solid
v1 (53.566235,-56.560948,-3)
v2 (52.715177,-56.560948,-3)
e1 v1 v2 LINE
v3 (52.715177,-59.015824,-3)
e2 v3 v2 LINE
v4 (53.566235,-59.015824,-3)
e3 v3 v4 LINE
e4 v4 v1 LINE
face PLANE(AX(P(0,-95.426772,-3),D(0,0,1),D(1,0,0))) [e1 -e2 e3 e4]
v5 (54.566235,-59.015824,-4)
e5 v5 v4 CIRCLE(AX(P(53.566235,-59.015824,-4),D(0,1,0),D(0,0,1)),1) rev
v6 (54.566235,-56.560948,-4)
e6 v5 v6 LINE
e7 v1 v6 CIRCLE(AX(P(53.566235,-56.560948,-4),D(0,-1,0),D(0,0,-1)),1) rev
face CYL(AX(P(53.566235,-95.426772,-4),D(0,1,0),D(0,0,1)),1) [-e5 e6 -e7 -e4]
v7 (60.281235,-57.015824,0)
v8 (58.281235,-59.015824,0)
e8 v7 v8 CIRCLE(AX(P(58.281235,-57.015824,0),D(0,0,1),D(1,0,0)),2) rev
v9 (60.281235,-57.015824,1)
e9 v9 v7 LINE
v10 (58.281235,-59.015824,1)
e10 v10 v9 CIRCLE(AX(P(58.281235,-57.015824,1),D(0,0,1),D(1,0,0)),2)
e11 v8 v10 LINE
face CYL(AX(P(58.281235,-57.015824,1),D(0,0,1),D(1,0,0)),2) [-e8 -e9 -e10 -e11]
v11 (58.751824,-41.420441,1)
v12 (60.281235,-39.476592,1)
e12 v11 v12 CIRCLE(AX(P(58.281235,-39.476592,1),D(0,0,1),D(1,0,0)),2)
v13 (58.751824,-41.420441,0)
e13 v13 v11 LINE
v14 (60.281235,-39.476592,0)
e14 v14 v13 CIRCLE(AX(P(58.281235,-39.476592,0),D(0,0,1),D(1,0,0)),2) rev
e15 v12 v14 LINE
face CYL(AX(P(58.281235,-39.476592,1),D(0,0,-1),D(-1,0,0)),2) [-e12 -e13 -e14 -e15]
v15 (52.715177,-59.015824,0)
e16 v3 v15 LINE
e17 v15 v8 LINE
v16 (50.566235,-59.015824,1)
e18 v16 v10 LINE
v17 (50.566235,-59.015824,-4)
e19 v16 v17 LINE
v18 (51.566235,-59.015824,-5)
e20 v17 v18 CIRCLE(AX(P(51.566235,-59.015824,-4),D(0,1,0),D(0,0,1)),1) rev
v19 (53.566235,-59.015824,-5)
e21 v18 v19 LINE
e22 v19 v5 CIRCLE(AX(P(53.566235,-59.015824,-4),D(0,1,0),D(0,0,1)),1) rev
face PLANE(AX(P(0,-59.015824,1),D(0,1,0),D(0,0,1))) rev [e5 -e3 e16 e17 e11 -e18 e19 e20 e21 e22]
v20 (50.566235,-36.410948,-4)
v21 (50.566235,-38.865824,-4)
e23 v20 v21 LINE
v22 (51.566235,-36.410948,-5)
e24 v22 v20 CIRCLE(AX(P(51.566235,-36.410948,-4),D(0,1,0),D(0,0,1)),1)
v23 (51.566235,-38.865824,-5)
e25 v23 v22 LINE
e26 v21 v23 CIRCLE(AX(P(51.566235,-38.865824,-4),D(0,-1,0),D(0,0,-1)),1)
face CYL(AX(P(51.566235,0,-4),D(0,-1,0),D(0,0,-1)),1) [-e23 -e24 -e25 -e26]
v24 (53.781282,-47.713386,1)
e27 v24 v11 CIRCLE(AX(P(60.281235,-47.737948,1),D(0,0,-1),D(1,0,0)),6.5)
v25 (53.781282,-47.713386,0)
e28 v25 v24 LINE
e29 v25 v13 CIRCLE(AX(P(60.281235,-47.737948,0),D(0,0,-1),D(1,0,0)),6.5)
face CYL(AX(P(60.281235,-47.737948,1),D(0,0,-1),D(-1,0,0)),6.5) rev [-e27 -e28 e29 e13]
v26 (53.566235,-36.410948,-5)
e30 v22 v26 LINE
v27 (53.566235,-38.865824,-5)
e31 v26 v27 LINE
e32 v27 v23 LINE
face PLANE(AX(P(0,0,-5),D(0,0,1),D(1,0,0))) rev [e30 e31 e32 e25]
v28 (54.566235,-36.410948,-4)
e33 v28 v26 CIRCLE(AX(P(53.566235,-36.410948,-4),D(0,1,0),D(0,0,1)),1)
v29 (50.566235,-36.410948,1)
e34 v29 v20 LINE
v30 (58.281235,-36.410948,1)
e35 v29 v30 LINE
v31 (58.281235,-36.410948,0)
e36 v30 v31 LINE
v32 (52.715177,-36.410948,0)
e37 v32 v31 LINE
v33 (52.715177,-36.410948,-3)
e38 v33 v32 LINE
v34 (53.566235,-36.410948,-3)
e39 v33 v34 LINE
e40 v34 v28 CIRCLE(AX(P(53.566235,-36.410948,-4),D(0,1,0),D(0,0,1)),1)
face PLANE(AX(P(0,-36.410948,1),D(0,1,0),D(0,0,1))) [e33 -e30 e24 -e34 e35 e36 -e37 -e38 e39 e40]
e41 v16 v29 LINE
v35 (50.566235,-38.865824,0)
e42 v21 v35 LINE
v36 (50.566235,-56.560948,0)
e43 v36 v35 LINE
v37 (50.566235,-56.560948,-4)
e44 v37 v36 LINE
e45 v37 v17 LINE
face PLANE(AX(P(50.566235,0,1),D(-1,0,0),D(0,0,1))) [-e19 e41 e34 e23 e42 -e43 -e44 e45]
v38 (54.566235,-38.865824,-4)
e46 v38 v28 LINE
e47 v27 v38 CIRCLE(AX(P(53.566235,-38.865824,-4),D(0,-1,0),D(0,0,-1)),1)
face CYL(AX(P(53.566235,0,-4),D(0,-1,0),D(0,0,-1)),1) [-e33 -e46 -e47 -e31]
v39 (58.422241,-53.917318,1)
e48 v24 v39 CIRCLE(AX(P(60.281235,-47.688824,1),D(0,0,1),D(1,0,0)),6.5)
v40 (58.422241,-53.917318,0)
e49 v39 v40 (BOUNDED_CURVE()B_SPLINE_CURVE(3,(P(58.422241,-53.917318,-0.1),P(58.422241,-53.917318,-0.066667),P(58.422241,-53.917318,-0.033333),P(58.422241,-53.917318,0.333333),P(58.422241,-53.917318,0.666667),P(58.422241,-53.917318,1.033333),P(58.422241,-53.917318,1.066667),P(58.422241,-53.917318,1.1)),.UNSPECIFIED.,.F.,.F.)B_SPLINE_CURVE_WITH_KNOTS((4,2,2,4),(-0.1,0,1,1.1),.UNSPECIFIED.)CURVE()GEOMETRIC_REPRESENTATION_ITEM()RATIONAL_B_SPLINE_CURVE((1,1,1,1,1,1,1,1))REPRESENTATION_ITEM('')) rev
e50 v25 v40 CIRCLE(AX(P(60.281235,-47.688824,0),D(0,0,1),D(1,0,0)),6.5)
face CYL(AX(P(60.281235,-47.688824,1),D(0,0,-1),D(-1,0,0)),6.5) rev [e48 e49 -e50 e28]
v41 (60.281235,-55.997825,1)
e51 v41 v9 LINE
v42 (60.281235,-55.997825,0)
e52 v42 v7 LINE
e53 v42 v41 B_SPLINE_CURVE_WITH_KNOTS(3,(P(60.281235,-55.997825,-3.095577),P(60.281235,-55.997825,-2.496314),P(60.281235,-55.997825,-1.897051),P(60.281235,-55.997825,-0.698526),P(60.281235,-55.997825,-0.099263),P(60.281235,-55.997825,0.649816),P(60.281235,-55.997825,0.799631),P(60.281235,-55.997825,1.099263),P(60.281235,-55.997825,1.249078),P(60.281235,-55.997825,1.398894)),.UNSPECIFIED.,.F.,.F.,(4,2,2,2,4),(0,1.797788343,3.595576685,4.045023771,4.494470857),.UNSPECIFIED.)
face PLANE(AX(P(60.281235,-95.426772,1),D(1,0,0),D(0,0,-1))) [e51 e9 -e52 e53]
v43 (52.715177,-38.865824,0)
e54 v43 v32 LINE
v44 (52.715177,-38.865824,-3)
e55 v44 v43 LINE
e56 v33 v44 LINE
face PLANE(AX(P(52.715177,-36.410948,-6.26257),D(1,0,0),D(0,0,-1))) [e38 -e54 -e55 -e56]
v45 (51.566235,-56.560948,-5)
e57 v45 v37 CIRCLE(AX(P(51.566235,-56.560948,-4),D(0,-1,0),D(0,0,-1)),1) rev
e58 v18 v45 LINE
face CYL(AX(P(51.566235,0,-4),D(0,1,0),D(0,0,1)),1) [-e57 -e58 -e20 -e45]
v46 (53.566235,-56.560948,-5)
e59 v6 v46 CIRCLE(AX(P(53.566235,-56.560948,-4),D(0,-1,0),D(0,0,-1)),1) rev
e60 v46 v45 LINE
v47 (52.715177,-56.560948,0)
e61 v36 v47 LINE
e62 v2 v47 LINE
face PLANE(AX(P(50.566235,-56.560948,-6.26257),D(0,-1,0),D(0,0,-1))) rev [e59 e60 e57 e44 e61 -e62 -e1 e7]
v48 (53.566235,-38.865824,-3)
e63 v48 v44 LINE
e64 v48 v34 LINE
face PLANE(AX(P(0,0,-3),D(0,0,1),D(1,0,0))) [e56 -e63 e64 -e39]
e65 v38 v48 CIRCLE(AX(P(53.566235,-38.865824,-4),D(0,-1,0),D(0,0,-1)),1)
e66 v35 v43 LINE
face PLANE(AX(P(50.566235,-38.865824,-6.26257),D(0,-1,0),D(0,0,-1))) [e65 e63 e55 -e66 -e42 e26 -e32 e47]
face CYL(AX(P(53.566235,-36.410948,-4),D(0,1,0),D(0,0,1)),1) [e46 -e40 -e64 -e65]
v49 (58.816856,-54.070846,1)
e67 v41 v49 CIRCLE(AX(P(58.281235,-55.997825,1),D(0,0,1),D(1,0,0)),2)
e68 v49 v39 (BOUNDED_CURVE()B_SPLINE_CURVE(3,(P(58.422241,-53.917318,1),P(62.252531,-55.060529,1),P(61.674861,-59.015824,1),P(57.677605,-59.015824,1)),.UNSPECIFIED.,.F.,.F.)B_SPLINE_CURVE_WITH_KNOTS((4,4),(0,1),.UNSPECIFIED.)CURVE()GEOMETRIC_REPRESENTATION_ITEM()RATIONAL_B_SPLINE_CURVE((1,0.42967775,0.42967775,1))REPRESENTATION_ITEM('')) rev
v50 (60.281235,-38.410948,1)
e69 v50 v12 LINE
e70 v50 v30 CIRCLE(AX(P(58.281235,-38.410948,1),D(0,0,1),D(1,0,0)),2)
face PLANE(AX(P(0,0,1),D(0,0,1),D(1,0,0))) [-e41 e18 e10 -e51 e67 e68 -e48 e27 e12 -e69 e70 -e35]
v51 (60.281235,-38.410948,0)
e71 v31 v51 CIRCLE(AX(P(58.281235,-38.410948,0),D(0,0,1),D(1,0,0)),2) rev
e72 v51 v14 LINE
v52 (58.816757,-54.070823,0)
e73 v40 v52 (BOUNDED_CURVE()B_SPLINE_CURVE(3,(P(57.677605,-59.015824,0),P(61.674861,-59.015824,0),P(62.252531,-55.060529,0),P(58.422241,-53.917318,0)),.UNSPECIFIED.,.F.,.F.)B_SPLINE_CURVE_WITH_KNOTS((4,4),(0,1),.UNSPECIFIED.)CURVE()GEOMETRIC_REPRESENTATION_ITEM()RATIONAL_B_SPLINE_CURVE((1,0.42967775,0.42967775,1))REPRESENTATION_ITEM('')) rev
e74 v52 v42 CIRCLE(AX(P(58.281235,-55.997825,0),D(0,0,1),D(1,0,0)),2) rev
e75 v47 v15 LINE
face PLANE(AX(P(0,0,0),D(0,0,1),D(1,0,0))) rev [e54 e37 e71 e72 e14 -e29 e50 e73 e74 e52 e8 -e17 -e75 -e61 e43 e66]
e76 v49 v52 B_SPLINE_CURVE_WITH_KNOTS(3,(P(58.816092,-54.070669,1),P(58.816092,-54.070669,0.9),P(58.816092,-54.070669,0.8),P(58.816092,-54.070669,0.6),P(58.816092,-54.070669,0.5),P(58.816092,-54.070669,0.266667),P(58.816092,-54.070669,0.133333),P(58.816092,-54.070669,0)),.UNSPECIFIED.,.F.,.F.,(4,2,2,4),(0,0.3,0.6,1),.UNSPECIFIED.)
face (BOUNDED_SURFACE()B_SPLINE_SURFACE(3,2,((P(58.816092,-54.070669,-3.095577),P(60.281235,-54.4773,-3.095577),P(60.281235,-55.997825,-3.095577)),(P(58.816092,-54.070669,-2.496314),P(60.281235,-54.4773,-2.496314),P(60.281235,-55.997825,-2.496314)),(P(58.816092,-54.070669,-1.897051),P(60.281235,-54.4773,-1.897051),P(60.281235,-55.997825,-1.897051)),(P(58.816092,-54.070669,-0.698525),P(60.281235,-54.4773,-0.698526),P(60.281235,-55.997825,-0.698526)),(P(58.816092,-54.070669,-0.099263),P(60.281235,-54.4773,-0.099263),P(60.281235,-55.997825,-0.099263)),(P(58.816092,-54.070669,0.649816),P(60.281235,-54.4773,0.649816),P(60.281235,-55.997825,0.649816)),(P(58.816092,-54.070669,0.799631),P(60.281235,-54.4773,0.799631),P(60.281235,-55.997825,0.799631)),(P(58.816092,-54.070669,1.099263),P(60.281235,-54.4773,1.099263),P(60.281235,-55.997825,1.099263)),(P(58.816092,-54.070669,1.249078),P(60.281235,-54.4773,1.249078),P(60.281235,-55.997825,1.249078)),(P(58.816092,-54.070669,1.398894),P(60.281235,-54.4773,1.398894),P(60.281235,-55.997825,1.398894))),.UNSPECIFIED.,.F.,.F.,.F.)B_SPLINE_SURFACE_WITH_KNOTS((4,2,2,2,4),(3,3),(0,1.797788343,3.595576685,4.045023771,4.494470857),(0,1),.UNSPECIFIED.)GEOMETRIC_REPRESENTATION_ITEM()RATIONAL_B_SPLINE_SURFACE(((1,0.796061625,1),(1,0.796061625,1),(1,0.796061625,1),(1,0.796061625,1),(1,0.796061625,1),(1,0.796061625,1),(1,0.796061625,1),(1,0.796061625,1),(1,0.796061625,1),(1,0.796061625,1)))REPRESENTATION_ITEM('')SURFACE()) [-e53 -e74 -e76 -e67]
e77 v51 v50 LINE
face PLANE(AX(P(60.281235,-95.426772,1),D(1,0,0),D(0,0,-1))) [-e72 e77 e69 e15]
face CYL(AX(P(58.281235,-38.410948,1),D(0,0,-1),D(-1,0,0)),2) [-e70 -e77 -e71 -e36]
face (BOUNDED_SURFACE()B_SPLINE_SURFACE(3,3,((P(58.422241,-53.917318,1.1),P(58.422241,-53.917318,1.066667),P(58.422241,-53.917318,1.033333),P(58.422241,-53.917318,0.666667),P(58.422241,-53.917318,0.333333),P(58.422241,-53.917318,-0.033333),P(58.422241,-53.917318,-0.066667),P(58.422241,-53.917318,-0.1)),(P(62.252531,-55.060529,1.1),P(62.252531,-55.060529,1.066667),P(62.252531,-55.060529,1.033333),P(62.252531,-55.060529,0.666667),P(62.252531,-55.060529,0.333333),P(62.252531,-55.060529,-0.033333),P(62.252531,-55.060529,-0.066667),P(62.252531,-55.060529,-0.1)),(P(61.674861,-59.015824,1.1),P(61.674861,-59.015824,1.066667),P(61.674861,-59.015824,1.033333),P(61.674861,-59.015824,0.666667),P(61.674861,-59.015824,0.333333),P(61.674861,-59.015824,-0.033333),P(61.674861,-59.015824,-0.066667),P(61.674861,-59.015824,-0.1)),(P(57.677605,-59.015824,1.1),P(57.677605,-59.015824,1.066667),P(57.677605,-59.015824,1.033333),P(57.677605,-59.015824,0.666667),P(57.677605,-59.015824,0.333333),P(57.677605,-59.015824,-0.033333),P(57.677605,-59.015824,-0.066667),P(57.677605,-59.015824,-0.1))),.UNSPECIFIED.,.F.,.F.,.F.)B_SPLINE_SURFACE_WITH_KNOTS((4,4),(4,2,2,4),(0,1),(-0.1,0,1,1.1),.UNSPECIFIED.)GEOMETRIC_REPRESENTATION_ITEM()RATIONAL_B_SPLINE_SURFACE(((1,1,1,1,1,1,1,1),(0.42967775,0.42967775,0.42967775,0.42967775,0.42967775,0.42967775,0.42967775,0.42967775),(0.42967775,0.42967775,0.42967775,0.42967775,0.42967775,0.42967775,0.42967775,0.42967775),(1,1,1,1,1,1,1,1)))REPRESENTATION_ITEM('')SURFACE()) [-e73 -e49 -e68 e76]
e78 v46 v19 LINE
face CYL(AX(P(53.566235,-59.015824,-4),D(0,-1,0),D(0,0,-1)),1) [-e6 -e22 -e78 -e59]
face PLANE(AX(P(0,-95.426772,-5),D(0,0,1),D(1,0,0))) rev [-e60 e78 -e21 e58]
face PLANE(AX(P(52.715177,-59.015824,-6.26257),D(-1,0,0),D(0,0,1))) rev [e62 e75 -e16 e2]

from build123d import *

# Parameters (mm, degrees)
BOSS_EXTRUDE1_DEPTH  = 1
FILLET1_START        = -1
FILLET1_DEPTH        = 3
FILLET2_START        = -1
FILLET2_DEPTH        = 3
SKETCH2_W            = 2.148941634
SKETCH2_H            = 2.454875289
BOSS_EXTRUDE2_DEPTH  = 4
SKETCH3_W            = 4
SKETCH3_H            = 2.454875289
BOSS_EXTRUDE3_DEPTH  = 2
FILLET3_R            = 1
FILLET3_OF_MIRROR1_R = 1
FILLET4_R            = 2


with BuildPart() as part:
    # Sketch1 → Boss-Extrude1 (new body)
    with BuildSketch(Plane.XY):
        with BuildLine():
            Line((50.566235294, -36.41094824), (50.566235294, -59.015823529))
            Line((50.566235294, -59.015823529), (60.281235294, -59.015823529))
            Line((60.281235294, -59.015823529), (60.281235294, -54.188823529))
            ThreePointArc((60.281235294, -54.188823529), (53.781235294, -47.688823529), (60.281235294, -41.188823529))
            Line((60.281235294, -41.188823529), (60.281235294, -36.41094824))
            Line((60.281235294, -36.41094824), (50.566235294, -36.41094824))
        make_face()
    boss_extrude1 = extrude(amount=BOSS_EXTRUDE1_DEPTH)

    # Fillet1: read off the stored shape, not the designer's step
    # Fillet1 outline → Fillet1 (cut)
    with BuildSketch(Plane.XY.offset(FILLET1_START)):
        with BuildLine():
            ThreePointArc((60.281235294, -54.188823529), (59.341877232, -54.12058895), (58.422241232, -53.917317816))
            add(Edge.make_bspline(
                [(58.422241232, -53.917317816), (59.442487987, -54.221826831), (60.281235188, -55.09507753), (60.281235294, -56.412193512)],
                knots=[0, 0, 0, 0, 0.45799037, 0.45799037, 0.45799037, 0.45799037], degree=3, weights=[1, 0.738797902, 0.597223849, 0.575277842]))
            Line((60.281235294, -56.412193512), (60.281235294, -54.188823529))
        make_face()
        with BuildLine():
            Line((60.281235294, -59.015823529), (60.281235294, -56.412193512))
            add(Edge.make_bspline(
                [(60.281235294, -56.412193512), (60.28123543, -58.106912276), (59.025045045, -59.01582353), (57.677605485, -59.015823529)],
                knots=[0.45799037, 0.45799037, 0.45799037, 0.45799037, 1, 1, 1, 1], degree=3, weights=[0.575277842, 0.549305795, 0.690879848, 1]))
            Line((57.677605485, -59.015823529), (60.281235294, -59.015823529))
        make_face()
    extrude(amount=FILLET1_DEPTH, mode=Mode.SUBTRACT)

    # Fillet2: read off the stored shape, not the designer's step
    # Fillet2 outline → Fillet2 (cut)
    with BuildSketch(Plane.XY.offset(FILLET2_START)):
        with BuildLine():
            Line((60.281235294, -36.41094824), (57.705740699, -36.41094824))
            add(Edge.make_bspline(
                [(57.705740699, -36.41094824), (59.038271524, -36.41094824), (60.281235294, -37.309720888), (60.281235294, -38.986442835)],
                knots=[0, 0, 0, 0, 0.541625397, 0.541625397, 0.541625397, 0.541625397], degree=3, weights=[1, 0.690686422, 0.548904933, 0.574655534]))
            Line((60.281235294, -38.986442835), (60.281235294, -36.41094824))
        make_face()
        with BuildLine():
            Line((60.281235294, -41.188823529), (60.281235294, -38.986442835))
            add(Edge.make_bspline(
                [(60.281235294, -38.986442835), (60.281235295, -40.292334143), (59.448338906, -41.156634612), (58.436628954, -41.456053082)],
                knots=[0.541625397, 0.541625397, 0.541625397, 0.541625397, 1, 1, 1, 1], degree=3, weights=[0.574655534, 0.596448126, 0.738229615, 1]))
            ThreePointArc((58.436628954, -41.456053082), (59.349303941, -41.255977817), (60.281235294, -41.188823529))
        make_face()
    extrude(amount=FILLET2_DEPTH, mode=Mode.SUBTRACT)

    # Sketch2 → Boss-Extrude2 (add)
    with BuildSketch(Plane.XY.offset(1)):
        with Locations((51.640706111, -37.638385885)):
            Rectangle(SKETCH2_W, SKETCH2_H)
    boss_extrude2 = extrude(amount=-BOSS_EXTRUDE2_DEPTH)

    # Sketch3 → Boss-Extrude3 (add)
    with BuildSketch(Plane(origin=(0, 0, -3), x_dir=(-1, 0, 0), z_dir=(0, 0, -1))):
        with Locations((-52.566235294, -37.638385885)):
            Rectangle(SKETCH3_W, SKETCH3_H)
    boss_extrude3 = extrude(amount=BOSS_EXTRUDE3_DEPTH)

    # Fillet3
    fillet3_edges = [part.edges().sort_by_distance(p)[0] for p in [
        (54.566235294, -37.638385885, -3),
        (54.566235294, -37.638385885, -5),
        (50.566235294, -37.638385885, -5),
    ]]
    fillet(fillet3_edges, radius=FILLET3_R - 0.0001)  # a hair under: the kernel refuses the full size

    # Mirror1: Boss-Extrude1, Boss-Extrude2, Boss-Extrude3 across plane
    add(boss_extrude1.mirror(Plane.ZX.offset(-47.713385885)))
    add(boss_extrude2.mirror(Plane.ZX.offset(-47.713385885)))
    add(boss_extrude3.mirror(Plane.ZX.offset(-47.713385885)))

    # Fillet3 of Mirror1
    fillet3_of_mirror1_edges = [part.edges().sort_by_distance(p)[0] for p in [
        (54.566235294, -57.788385885, -3),
        (54.566235294, -57.788385885, -5),
        (50.566235294, -57.788385885, -5),
    ]]
    fillet(fillet3_of_mirror1_edges, radius=FILLET3_OF_MIRROR1_R - 0.0001)  # a hair under: the kernel refuses the full size

    # Fillet4
    # the kernel refuses this fillet: 2 mm, written as the material it takes off along each edge
    with BuildSketch(Plane(origin=(60.281235294, -41.23794824, -4.403389552), x_dir=(0, 1, 0), z_dir=(0, 0, 1))) as fillet4_piece_1:
        with BuildLine():
            CenterArc((1.761355821, 2), FILLET4_R, 193.608960631, 76.391039369)
            Line((-0.182492608, 1.529411765), (-0.221369576, 1.52))
            ThreePointArc((-0.221369576, 1.52), (-0.085502649, 0.765391227), (-0.04, 0))
            Line((-0.04, 0), (0, -0.04))
            Line((0, -0.04), (1.761355821, -0.04))
            Line((1.761355821, -0.04), (1.761355821, 0))
        make_face()
    extrude(amount=9.806779105, mode=Mode.SUBTRACT)
    with BuildSketch(Plane(origin=(60.281235294, -36.41094824, -5), x_dir=(-1, 0, 0), z_dir=(0, 0, 1))) as fillet4_piece_2:
        with BuildLine():
            CenterArc((FILLET4_R, FILLET4_R), FILLET4_R, 180, 90)
            Line((0, FILLET4_R), (-FILLET4_R * 0.02, FILLET4_R))
            Line((-FILLET4_R * 0.02, FILLET4_R), (-FILLET4_R * 0.02, -FILLET4_R * 0.02))
            Line((-FILLET4_R * 0.02, -FILLET4_R * 0.02), (FILLET4_R, -FILLET4_R * 0.02))
            Line((FILLET4_R, -FILLET4_R * 0.02), (FILLET4_R, 0))
        make_face()
    extrude(amount=11, mode=Mode.SUBTRACT)
    with BuildSketch(Plane(origin=(60.281235294, -59.015823529, -5), x_dir=(-1, 0, 0), z_dir=(0, 0, 1))) as fillet4_piece_3:
        with BuildLine():
            CenterArc((FILLET4_R, -FILLET4_R), FILLET4_R, 90, 90)
            Line((0, -FILLET4_R), (-FILLET4_R * 0.02, -FILLET4_R))
            Line((-FILLET4_R * 0.02, -FILLET4_R), (-FILLET4_R * 0.02, FILLET4_R * 0.02))
            Line((-FILLET4_R * 0.02, FILLET4_R * 0.02), (FILLET4_R, FILLET4_R * 0.02))
            Line((FILLET4_R, FILLET4_R * 0.02), (FILLET4_R, 0))
        make_face()
    extrude(amount=11, mode=Mode.SUBTRACT)
    with BuildSketch(Plane(origin=(60.281235294, -54.23794824, -4.399691242), x_dir=(0, -1, 0), z_dir=(0, 0, 1))) as fillet4_piece_4:
        with BuildLine():
            CenterArc((1.759876497, -2), FILLET4_R, 90, 74.48871178)
            Line((-0.167279071, -1.465143556), (-0.205822183, -1.454446427))
            ThreePointArc((-0.205822183, -1.454446427), (-0.081696985, -0.732793564), (-0.04, 0))
            Line((-0.04, 0), (0, 0.04))
            Line((0, 0.04), (1.759876497, 0.04))
            Line((1.759876497, 0.04), (1.759876497, 0))
        make_face()
    extrude(amount=9.799382485, mode=Mode.SUBTRACT)


solid = part.part
